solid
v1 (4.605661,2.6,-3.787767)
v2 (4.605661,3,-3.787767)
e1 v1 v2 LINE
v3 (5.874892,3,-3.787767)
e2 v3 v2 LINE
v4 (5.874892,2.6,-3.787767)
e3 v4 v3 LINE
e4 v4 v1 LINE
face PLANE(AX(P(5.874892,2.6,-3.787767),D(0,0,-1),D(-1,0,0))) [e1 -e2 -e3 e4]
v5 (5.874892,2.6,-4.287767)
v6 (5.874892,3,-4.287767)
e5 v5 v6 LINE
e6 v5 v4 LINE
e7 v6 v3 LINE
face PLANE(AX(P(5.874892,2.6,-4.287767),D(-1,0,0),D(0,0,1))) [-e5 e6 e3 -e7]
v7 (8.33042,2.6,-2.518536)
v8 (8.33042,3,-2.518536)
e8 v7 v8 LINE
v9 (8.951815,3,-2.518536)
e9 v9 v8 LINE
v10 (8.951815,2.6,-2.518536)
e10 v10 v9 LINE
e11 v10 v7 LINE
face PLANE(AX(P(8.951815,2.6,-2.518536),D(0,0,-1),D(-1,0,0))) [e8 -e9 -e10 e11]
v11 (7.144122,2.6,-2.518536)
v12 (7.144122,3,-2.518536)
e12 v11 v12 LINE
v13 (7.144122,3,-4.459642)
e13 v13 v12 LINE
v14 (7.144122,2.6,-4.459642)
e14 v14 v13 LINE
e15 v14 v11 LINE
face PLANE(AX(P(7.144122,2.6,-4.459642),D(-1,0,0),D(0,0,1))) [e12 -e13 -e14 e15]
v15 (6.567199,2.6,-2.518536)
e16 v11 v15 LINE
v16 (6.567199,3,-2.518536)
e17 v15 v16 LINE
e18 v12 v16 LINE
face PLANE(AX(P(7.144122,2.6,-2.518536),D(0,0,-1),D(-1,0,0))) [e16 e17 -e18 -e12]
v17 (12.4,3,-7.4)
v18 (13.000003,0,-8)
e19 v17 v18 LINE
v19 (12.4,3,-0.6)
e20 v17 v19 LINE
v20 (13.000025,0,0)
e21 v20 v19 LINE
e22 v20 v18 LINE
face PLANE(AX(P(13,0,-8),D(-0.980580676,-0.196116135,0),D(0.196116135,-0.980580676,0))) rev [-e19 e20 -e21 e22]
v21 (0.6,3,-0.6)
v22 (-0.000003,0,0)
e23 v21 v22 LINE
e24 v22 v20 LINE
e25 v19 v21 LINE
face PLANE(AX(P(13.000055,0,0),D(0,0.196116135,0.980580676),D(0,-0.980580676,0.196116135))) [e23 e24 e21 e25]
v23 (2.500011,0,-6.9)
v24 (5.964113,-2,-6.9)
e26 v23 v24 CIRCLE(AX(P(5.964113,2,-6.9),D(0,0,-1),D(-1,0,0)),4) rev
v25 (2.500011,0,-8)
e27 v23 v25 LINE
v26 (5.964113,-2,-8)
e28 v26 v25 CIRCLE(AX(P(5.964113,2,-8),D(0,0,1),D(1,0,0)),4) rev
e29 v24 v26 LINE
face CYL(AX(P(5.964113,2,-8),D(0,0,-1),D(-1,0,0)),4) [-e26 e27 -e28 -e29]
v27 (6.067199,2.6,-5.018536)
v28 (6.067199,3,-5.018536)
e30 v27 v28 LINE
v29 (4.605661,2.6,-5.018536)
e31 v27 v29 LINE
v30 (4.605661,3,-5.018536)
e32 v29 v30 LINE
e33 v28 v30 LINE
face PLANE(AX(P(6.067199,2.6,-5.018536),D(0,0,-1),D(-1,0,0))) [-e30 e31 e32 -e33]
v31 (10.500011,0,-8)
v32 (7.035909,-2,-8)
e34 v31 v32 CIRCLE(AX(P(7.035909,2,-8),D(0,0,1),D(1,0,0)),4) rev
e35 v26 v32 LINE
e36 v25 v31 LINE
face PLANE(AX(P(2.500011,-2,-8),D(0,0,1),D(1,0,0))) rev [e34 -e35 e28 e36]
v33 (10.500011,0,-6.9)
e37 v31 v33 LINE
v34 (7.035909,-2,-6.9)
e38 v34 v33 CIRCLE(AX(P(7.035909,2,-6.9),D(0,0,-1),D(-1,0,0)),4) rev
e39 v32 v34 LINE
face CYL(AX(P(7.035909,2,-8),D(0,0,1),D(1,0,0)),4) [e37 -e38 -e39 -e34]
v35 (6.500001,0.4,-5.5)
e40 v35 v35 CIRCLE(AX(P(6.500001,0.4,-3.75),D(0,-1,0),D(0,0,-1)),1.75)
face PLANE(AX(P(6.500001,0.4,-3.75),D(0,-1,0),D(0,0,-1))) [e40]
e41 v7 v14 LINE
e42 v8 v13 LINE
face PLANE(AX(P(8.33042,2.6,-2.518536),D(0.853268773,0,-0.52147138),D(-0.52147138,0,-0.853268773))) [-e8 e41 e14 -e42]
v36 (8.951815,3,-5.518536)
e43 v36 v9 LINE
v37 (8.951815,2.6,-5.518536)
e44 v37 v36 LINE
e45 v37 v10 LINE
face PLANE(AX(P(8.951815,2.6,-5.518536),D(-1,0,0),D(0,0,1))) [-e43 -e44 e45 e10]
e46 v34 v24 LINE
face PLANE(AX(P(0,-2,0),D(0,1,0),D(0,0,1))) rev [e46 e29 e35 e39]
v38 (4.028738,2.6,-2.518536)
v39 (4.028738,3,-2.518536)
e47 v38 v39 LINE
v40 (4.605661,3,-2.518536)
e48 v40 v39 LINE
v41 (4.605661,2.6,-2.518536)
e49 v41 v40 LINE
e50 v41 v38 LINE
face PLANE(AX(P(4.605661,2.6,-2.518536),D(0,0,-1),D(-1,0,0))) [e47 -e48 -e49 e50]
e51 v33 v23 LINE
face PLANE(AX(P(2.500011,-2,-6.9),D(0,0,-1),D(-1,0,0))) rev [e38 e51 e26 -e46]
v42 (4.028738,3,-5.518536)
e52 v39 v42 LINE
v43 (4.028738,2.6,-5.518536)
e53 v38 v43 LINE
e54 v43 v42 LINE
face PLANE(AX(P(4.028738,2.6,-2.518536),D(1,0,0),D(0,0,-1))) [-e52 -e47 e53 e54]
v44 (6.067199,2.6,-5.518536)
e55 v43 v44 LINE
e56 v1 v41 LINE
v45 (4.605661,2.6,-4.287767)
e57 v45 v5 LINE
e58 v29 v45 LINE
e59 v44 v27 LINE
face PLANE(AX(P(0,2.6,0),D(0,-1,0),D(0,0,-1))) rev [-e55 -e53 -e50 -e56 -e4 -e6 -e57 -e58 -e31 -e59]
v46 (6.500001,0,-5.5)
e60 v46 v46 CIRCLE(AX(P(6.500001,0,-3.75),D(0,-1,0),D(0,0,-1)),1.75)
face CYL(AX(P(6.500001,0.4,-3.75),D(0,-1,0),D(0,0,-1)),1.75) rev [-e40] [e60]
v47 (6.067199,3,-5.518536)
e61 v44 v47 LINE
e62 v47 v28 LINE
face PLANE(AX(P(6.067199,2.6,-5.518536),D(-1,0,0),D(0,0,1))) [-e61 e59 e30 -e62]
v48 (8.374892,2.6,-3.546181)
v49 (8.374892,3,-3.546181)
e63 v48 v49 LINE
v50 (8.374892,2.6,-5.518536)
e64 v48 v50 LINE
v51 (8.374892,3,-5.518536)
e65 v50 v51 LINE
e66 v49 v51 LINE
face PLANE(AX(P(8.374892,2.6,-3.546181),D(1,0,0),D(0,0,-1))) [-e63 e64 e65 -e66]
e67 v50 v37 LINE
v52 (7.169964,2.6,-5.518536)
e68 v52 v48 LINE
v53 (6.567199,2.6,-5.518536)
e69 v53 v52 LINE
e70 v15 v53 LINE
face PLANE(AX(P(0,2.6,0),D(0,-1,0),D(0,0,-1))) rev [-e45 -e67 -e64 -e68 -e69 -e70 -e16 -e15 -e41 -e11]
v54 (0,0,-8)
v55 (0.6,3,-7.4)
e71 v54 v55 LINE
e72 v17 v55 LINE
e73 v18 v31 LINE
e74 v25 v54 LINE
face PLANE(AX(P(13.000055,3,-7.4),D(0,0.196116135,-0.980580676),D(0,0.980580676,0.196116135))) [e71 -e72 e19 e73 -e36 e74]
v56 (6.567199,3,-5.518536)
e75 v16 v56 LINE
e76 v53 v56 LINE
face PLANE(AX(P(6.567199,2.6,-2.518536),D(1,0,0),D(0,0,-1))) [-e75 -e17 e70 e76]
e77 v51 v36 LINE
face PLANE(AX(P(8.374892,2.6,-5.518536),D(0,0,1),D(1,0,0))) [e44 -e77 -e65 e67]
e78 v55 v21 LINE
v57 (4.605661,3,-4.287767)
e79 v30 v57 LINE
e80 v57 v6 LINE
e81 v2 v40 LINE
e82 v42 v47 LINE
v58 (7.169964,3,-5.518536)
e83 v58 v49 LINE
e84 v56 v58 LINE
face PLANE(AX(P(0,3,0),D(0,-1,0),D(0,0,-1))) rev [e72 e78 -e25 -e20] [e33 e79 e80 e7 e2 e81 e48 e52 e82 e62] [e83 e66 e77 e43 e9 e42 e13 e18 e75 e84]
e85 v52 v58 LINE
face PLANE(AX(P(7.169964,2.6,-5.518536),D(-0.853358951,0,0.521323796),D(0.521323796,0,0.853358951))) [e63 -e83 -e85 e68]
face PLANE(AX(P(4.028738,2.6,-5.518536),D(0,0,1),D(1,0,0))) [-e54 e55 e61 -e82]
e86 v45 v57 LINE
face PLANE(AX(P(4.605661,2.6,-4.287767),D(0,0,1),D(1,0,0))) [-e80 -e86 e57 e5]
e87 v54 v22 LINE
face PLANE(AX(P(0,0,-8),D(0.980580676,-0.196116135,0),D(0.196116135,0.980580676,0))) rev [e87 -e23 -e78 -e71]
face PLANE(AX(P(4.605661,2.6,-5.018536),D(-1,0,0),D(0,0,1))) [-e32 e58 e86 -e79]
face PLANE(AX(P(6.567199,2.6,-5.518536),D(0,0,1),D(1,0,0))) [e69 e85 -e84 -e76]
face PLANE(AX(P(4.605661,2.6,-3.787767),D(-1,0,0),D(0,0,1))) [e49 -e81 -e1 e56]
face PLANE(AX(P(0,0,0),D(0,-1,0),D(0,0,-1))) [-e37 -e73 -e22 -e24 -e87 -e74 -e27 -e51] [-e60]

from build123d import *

# Parameters (mm, degrees)
SKETCH1_W               = 13
SKETCH1_H               = 8
BOSS_EXTRUDE1_DEPTH     = 3
CUT_EXTRUDE1_DEPTH      = 16.556349186
CUT_EXTRUDE1_DEPTH_BACK = 16.556349186
CUT_EXTRUDE2_DEPTH      = 16.556349186
CUT_EXTRUDE2_DEPTH_BACK = 16.556349186
SKETCH4_R               = 1.75
CUT_EXTRUDE3_DEPTH      = 0.4
SKETCH5_W               = 8
SKETCH5_H               = 1.1
BOSS_EXTRUDE2_DEPTH     = 2
FILLET1_R               = 4
CUT_EXTRUDE4_DEPTH      = 0.4


with BuildPart() as part:
    # Sketch1 → Boss-Extrude1 (new body)
    with BuildSketch(Plane(origin=(0, 0, 0), x_dir=(1, 0, 0), z_dir=(0, 1, 0))):
        with Locations((6.5, 4)):
            Rectangle(SKETCH1_W, SKETCH1_H)
    extrude(amount=BOSS_EXTRUDE1_DEPTH)

    # Sketch2 → Cut-Extrude1 (cut, two sides: drawn at the far end of the back side and taken through both)
    with BuildSketch(Plane.XY.offset(-CUT_EXTRUDE1_DEPTH_BACK)):
        Polygon((0, 0), (0.6, 3), (0, 3), align=None)
        Polygon((13, 0), (12.4, 3), (13, 3), align=None)
    extrude(amount=CUT_EXTRUDE1_DEPTH + CUT_EXTRUDE1_DEPTH_BACK, mode=Mode.SUBTRACT)

    # Sketch3 → Cut-Extrude2 (cut, two sides: drawn at the far end of the back side and taken through both)
    with BuildSketch(Plane(origin=(0, 0, 0), x_dir=(0, 0, -1), z_dir=(1, 0, 0)).offset(-CUT_EXTRUDE2_DEPTH_BACK)):
        Polygon((0, 0), (0.6, 3), (0, 3), align=None)
        Polygon((8, 3), (7.4, 3), (8, 0), align=None)
    extrude(amount=CUT_EXTRUDE2_DEPTH + CUT_EXTRUDE2_DEPTH_BACK, mode=Mode.SUBTRACT)

    # Sketch4 → Cut-Extrude3 (cut)
    with BuildSketch(Plane.XZ):
        with Locations(Location((6.50000125, -3.75, 0), (0, 0, 270))):
            Circle(SKETCH4_R)
    extrude(amount=-CUT_EXTRUDE3_DEPTH, mode=Mode.SUBTRACT)

    # Sketch5 → Boss-Extrude2 (add)
    with BuildSketch(Plane.XZ):
        with Locations((6.500011, -7.45)):
            Rectangle(SKETCH5_W, SKETCH5_H)
    extrude(amount=BOSS_EXTRUDE2_DEPTH)

    # Fillet1
    # the kernel refuses this fillet: 4 mm, written as the material it takes off along each edge
    with BuildSketch(Plane(origin=(10.500011, -2, -16.660254038), x_dir=(0, 1, 0), z_dir=(0, 0, 1)), Plane(origin=(2.500011, -2, 1.760254038), x_dir=(0, 1, 0), z_dir=(0, 0, -1))) as fillet1_piece_1:
        with BuildLine():
            CenterArc((4, 3.464101615), FILLET1_R, 180, 60)
            Line((0, 3.464101615), (-0.08, 3.464101615))
            Line((-0.08, 3.464101615), (-0.08, 0))
            Line((-0.08, 0), (0, -0.08))
            ThreePointArc((0, -0.08), (1, -0.08), (1.96, -0.069282032))
            Line((1.96, -0.069282032), (2, 0))
        make_face()
    extrude(amount=18.420508076, mode=Mode.SUBTRACT)

    # Sketch6 → Cut-Extrude4 (cut)
    with BuildSketch(Plane(origin=(0, 3, 0), x_dir=(1, 0, 0), z_dir=(0, 1, 0))):
        Polygon((4.028737707, 2.518536397), (4.028737707, 5.518536397), (6.067199245, 5.518536397), (6.067199245, 5.018536397), (4.605660784, 5.018536397), (4.605660784, 4.287767167), (5.874891553, 4.287767167), (5.874891553, 3.787767167), (4.605660784, 3.787767167), (4.605660784, 2.518536397), align=None)
        Polygon((6.567199245, 2.518536397), (6.567199245, 5.518536397), (7.169963668, 5.518536397), (8.374891553, 3.546180628), (8.374891553, 5.518536397), (8.95181463, 5.518536397), (8.95181463, 2.518536397), (8.330420399, 2.518536397), (7.144122322, 4.459642167), (7.144122322, 2.518536397), align=None)
    extrude(amount=-CUT_EXTRUDE4_DEPTH, mode=Mode.SUBTRACT)


solid = part.part
